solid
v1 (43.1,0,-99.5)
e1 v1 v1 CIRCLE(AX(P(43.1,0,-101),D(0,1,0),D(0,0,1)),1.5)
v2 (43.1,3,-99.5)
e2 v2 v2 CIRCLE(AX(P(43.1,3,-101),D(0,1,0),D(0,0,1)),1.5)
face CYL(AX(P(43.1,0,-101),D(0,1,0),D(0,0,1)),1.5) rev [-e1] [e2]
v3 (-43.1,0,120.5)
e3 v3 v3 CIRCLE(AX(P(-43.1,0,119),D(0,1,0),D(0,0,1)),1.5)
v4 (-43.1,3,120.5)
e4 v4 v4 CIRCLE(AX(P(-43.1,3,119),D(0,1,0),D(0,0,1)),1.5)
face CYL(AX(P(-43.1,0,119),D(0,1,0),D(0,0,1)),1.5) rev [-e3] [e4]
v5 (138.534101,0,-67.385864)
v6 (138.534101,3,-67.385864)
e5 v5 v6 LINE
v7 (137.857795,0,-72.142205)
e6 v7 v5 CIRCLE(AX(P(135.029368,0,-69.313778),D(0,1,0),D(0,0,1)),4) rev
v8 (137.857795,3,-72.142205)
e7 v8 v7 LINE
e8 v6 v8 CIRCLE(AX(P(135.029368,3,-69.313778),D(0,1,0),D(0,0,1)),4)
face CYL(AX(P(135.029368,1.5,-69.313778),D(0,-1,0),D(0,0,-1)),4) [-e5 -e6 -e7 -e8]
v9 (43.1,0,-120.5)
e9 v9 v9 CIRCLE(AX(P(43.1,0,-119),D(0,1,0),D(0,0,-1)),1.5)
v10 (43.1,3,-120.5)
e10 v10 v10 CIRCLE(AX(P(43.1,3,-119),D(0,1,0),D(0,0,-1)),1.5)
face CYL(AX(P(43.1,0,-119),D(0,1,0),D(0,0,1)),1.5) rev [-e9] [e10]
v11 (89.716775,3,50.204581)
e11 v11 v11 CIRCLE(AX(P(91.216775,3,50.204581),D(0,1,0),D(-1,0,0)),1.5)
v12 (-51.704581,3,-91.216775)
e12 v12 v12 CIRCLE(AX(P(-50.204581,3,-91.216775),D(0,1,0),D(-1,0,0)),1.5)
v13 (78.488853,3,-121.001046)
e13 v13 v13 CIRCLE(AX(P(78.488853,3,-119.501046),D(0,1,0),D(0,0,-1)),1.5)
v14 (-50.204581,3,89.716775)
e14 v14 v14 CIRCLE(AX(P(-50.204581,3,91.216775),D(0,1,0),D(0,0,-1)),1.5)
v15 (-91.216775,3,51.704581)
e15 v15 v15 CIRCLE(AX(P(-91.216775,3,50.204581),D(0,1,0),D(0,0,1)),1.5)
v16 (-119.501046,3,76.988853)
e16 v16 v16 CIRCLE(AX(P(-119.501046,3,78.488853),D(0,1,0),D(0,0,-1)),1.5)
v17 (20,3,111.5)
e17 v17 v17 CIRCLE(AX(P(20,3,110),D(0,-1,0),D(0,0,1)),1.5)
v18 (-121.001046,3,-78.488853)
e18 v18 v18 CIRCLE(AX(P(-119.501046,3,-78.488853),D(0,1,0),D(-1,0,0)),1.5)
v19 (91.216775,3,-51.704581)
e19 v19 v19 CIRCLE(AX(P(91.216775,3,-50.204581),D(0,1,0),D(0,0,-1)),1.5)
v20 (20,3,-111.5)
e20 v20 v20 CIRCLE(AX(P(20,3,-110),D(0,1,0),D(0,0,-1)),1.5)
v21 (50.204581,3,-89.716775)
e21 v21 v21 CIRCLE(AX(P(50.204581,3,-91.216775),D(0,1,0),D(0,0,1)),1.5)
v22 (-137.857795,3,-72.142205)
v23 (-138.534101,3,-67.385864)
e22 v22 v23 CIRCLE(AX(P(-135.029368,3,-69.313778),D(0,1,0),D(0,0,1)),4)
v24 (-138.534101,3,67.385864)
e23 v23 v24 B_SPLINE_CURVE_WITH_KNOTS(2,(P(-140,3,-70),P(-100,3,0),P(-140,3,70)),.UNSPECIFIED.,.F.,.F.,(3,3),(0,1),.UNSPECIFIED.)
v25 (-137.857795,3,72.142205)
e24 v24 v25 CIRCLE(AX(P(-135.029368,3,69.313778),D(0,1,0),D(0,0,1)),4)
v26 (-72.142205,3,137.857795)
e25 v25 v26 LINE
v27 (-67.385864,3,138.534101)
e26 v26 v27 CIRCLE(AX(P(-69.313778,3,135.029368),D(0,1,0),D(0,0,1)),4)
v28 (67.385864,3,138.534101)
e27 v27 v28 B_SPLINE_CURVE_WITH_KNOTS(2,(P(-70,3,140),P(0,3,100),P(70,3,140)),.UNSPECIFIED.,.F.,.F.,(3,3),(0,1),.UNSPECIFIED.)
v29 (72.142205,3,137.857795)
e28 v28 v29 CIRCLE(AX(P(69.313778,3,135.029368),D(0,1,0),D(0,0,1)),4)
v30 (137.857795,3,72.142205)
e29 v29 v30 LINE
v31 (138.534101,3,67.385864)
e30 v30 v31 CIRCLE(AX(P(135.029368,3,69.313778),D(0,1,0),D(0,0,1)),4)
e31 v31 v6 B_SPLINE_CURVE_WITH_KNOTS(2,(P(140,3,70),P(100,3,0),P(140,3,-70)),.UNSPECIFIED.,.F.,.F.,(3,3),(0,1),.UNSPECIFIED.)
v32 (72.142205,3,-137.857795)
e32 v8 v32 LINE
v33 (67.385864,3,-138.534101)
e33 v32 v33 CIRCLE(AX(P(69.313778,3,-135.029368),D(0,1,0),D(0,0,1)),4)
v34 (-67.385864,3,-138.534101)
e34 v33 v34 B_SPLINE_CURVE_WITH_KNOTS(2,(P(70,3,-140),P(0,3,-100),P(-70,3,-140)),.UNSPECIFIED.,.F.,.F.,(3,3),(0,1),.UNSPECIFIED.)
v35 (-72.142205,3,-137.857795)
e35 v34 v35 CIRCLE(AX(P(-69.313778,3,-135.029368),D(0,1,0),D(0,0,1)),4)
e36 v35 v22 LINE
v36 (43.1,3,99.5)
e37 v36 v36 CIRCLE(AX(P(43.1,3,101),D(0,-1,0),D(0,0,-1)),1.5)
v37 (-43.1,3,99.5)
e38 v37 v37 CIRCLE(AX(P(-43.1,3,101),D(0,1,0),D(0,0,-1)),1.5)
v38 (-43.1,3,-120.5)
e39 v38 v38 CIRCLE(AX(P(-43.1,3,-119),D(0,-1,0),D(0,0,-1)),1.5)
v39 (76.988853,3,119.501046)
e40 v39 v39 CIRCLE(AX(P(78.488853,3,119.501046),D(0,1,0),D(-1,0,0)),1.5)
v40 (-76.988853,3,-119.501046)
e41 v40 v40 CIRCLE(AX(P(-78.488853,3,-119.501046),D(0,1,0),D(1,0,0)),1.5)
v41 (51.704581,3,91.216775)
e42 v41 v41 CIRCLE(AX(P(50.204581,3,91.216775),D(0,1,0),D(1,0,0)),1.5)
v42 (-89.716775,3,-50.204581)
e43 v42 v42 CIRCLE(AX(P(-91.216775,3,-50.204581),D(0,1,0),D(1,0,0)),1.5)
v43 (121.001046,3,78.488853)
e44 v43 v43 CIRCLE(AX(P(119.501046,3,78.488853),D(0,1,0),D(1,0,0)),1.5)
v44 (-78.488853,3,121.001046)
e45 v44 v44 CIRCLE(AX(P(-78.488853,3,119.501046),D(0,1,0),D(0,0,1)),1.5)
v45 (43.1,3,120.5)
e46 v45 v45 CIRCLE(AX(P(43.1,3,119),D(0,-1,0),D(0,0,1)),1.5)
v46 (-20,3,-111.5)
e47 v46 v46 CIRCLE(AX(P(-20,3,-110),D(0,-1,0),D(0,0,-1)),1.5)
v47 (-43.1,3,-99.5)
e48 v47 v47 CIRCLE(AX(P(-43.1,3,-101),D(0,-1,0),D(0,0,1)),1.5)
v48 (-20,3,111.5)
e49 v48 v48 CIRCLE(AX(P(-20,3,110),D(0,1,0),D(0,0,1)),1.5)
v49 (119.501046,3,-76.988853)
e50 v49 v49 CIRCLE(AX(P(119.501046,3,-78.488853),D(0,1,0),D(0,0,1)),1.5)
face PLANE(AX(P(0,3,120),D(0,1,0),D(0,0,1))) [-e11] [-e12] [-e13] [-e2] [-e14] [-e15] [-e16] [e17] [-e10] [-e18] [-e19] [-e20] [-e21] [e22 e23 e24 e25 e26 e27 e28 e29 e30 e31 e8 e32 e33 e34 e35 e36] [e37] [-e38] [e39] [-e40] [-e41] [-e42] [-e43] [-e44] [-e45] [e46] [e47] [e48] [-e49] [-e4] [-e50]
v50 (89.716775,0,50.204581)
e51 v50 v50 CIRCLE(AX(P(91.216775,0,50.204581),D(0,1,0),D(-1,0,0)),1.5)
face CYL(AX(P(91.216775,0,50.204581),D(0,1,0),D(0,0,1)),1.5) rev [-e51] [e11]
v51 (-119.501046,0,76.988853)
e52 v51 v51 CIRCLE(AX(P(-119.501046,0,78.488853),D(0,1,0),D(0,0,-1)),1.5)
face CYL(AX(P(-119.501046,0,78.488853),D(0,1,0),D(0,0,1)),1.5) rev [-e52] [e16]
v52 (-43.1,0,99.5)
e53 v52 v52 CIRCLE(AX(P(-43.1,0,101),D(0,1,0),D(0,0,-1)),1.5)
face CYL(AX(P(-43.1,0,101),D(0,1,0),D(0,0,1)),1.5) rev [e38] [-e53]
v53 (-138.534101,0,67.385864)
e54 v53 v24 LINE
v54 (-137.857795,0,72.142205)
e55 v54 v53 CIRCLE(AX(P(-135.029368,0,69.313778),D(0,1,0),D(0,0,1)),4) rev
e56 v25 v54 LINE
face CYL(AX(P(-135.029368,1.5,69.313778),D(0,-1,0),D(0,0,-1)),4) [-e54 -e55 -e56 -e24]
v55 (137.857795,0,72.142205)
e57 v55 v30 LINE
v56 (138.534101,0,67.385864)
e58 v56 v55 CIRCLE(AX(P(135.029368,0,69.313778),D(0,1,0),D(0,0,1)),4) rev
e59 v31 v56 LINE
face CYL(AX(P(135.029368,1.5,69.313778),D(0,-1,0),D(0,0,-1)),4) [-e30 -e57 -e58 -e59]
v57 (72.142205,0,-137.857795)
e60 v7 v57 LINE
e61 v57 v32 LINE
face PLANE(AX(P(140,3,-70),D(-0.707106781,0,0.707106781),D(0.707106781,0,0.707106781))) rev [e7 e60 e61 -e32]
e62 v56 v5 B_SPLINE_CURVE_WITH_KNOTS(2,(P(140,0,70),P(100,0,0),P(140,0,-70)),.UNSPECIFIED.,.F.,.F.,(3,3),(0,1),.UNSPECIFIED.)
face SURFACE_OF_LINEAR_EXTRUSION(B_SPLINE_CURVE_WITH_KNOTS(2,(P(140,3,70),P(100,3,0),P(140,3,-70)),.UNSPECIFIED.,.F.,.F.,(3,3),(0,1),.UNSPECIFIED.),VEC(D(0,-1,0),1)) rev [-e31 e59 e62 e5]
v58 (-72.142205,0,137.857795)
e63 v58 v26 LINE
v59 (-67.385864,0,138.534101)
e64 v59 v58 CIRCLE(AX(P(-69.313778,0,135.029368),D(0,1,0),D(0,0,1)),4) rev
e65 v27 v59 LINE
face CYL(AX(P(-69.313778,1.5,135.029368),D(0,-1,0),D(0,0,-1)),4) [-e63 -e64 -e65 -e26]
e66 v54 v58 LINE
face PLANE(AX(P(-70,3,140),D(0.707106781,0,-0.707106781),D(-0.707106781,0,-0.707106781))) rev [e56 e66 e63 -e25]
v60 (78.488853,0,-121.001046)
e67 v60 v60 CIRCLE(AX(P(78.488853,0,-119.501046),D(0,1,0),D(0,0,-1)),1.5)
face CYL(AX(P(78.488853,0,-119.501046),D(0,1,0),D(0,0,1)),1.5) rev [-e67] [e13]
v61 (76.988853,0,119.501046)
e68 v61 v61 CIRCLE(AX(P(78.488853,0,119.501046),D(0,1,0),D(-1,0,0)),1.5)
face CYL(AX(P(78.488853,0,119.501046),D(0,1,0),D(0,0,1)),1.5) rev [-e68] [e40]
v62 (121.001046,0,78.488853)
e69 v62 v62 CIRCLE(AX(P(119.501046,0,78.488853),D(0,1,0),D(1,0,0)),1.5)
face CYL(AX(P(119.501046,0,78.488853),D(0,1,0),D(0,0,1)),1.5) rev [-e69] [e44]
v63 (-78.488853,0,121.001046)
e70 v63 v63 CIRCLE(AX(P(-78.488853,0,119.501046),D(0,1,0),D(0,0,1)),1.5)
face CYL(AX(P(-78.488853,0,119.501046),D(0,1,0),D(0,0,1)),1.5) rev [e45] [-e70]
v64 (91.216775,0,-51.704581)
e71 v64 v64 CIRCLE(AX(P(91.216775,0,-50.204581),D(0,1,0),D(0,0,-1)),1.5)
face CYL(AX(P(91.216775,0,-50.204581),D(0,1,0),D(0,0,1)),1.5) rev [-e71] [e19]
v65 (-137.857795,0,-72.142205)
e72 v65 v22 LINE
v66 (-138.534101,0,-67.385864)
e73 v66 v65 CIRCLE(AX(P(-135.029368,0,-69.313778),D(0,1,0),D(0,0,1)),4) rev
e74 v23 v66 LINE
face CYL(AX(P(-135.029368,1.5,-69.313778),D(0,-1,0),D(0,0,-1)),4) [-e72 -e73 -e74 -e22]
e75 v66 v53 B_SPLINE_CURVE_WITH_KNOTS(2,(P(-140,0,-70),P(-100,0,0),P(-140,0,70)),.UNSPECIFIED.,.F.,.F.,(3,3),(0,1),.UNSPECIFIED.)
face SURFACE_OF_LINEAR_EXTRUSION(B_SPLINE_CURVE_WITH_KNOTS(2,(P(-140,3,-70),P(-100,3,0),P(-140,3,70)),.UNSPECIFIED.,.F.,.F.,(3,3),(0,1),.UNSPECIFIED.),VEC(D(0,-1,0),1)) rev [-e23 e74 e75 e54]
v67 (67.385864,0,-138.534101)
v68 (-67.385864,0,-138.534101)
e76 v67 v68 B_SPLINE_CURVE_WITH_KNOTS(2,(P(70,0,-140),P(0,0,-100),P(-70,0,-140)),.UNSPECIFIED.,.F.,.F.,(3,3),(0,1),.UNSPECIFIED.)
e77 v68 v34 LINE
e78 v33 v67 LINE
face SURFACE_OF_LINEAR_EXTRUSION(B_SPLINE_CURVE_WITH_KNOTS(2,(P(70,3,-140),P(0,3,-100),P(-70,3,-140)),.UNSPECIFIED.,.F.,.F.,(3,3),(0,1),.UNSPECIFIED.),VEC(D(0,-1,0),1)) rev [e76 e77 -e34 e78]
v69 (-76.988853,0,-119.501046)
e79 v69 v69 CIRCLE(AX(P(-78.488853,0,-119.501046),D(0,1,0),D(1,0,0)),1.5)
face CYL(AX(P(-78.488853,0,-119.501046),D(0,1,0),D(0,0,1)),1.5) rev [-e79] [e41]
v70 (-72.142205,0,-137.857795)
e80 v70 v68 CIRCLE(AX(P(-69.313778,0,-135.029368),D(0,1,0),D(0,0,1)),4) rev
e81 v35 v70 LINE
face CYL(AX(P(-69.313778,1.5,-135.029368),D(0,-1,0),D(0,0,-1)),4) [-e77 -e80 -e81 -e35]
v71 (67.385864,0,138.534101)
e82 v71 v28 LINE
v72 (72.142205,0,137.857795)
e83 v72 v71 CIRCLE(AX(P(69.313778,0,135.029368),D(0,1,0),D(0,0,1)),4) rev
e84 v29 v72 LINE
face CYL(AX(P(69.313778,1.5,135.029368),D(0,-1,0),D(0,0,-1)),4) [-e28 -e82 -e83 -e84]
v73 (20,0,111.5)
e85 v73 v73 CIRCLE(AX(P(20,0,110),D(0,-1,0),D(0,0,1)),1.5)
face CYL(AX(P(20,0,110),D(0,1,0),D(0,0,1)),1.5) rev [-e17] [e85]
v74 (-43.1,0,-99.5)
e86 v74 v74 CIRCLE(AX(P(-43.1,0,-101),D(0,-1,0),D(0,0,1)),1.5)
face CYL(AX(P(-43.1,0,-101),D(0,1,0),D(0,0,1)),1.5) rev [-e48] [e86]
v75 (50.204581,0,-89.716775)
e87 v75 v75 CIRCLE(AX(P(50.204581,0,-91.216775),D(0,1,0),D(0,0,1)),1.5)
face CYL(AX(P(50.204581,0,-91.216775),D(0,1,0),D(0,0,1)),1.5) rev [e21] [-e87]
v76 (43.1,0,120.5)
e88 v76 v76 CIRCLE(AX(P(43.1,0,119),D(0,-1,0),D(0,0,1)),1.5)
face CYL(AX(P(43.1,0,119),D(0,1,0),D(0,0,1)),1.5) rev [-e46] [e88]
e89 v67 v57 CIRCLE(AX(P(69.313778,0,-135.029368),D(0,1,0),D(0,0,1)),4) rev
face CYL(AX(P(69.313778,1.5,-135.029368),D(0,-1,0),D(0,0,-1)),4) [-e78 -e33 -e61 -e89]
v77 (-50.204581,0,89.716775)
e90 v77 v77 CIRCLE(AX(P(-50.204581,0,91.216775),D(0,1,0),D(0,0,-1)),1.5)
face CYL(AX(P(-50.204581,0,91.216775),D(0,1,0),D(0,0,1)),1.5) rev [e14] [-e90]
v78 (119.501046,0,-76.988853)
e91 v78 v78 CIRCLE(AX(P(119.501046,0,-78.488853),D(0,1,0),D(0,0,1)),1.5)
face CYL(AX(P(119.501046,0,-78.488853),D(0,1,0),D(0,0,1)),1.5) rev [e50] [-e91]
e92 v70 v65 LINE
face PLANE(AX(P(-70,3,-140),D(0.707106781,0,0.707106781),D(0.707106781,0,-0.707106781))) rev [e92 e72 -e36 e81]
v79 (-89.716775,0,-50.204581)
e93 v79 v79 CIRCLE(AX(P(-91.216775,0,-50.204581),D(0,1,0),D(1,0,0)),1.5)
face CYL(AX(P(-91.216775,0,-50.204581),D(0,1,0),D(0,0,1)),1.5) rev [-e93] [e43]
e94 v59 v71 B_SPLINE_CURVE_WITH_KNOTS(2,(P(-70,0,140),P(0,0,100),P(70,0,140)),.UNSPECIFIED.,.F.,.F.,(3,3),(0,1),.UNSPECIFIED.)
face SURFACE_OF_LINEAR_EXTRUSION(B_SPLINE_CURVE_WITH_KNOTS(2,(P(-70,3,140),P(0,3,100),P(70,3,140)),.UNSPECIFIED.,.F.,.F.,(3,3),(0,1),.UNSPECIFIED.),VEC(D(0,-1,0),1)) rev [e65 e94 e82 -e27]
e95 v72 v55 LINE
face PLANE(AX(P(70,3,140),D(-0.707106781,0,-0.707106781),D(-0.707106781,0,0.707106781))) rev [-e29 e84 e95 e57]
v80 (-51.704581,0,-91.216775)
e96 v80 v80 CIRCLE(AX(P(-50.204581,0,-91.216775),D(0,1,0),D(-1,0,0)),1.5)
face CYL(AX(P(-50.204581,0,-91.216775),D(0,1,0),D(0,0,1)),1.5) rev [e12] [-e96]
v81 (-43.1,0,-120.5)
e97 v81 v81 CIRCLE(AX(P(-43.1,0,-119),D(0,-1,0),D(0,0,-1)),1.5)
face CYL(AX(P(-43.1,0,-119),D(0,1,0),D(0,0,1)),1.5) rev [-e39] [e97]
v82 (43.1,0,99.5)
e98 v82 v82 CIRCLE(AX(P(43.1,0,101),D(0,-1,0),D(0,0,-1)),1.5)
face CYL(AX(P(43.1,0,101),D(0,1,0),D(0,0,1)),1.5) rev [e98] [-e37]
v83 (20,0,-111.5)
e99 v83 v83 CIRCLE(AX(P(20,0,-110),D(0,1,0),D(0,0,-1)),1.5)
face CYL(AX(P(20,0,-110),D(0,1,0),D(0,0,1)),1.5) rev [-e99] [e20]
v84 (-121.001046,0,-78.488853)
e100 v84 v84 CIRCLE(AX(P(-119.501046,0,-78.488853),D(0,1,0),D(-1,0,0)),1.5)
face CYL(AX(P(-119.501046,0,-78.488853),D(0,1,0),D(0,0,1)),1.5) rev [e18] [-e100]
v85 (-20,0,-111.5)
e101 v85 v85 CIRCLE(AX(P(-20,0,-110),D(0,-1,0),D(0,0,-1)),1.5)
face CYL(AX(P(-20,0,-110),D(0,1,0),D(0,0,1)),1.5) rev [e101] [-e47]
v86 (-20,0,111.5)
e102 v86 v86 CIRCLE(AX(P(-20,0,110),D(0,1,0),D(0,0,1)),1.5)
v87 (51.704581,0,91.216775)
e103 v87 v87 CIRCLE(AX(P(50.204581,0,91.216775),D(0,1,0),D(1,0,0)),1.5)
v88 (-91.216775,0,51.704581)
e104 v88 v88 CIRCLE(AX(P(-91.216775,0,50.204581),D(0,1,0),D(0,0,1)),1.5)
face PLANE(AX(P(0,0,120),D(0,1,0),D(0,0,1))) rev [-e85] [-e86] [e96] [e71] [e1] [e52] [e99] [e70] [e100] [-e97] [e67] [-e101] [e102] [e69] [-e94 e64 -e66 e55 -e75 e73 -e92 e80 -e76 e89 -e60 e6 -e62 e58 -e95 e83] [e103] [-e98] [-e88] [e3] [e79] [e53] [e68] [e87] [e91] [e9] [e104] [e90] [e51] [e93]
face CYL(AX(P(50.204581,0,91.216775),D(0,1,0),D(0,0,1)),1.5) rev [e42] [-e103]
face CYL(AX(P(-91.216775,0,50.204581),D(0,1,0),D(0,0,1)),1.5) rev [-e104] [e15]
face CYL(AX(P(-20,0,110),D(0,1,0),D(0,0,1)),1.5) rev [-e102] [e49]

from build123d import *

# Parameters (mm, degrees)
DODANIE_WYCI_GNI_CIE1_DEPTH = 3
ZAOKR_GLENIE1_R             = 4
SZKIC2_R                    = 1.5
WYTNIJ_WYCI_GNI_CIE1_DEPTH  = 197.640104054
SZYK_KO_OWY1_COUNT          = 4
SZKIC3_R                    = 1.5
WYTNIJ_WYCI_GNI_CIE2_DEPTH  = 197.640104054
SZYK_KO_OWY2_OUTLINE_R      = 1.5
SZYK_KO_OWY2_DEPTH          = 3


# Read off the part's stored shape, not the designer's step: Szyk kołowy2
with BuildPart() as part:
    # Szkic1 → Dodanie-wyciągnięcie1 (new body)
    with BuildSketch(Plane(origin=(0, 0, 0), x_dir=(1, 0, 0), z_dir=(0, 1, 0))):
        with BuildLine():
            Line((-70, -140), (-140, -70))
            add(Edge.make_bspline(
                [(-140, 70), (-100, 0), (-140, -70)],
                knots=[0, 0, 0, 1, 1, 1], degree=2))
            Line((-140, 70), (-70, 140))
            add(Edge.make_bspline(
                [(70, 140), (0, 100), (-70, 140)],
                knots=[0, 0, 0, 1, 1, 1], degree=2))
            Line((70, 140), (140, 70))
            add(Edge.make_bspline(
                [(140, -70), (100, 0), (140, 70)],
                knots=[0, 0, 0, 1, 1, 1], degree=2))
            Line((140, -70), (70, -140))
            add(Edge.make_bspline(
                [(-70, -140), (0, -100), (70, -140)],
                knots=[0, 0, 0, 1, 1, 1], degree=2))
        make_face()
    extrude(amount=DODANIE_WYCI_GNI_CIE1_DEPTH)

    # Zaokrąglenie1
    zaokr_glenie1_edges = [part.edges().sort_by_distance(p)[0] for p in [
        (-140, 1.5, -70),
        (-70, 1.5, -140),
        (70, 1.5, -140),
        (140, 1.5, -70),
        (140, 1.5, 70),
        (70, 1.5, 140),
        (-140, 1.5, 70),
        (-70, 1.5, 140),
    ]]
    fillet(zaokr_glenie1_edges, radius=ZAOKR_GLENIE1_R)

    # Szkic2 → Wytnij-wyciągnięcie1 (cut, through all)
    with BuildSketch(Plane(origin=(0, 3, 0), x_dir=(1, 0, 0), z_dir=(0, 1, 0))):
        with Locations(Location((-78.488852712, -119.501046021, 0), (0, 0, 270))):
            Circle(SZKIC2_R)
        with Locations(Location((-119.501046021, -78.488852712, 0), (0, 0, 90))):
            Circle(SZKIC2_R)
        with Locations(Location((-50.204581464, -91.216774773, 0), (0, 0, 90))):
            Circle(SZKIC2_R)
        with Locations(Location((-91.216774773, -50.204581464, 0), (0, 0, 270))):
            Circle(SZKIC2_R)
    wytnij_wyci_gni_cie1 = extrude(amount=-WYTNIJ_WYCI_GNI_CIE1_DEPTH, mode=Mode.SUBTRACT)

    # Szyk kołowy1: Wytnij-wyciągnięcie1 ×4 about axis
    szyk_ko_owy1_axis = Axis((0, 0, 0), (0, 1, 0))
    for i in range(1, SZYK_KO_OWY1_COUNT):
        add(wytnij_wyci_gni_cie1.rotate(szyk_ko_owy1_axis, i * 360 / SZYK_KO_OWY1_COUNT), mode=Mode.SUBTRACT)

    # Szkic3 → Wytnij-wyciągnięcie2 (cut, through all)
    with BuildSketch(Plane(origin=(0, 3, 0), x_dir=(1, 0, 0), z_dir=(0, 1, 0))):
        with Locations(Location((-43.1, -119, 0), (0, 0, 270))):
            Circle(SZKIC3_R)
        with Locations(Location((-20, -110, 0), (0, 0, 270))):
            Circle(SZKIC3_R)
        with Locations(Location((-43.1, -101, 0), (0, 0, 90))):
            Circle(SZKIC3_R)
    wytnij_wyci_gni_cie2 = extrude(amount=-WYTNIJ_WYCI_GNI_CIE2_DEPTH, mode=Mode.SUBTRACT)

    # Lustro1: Wytnij-wyciągnięcie2 across plane
    add(wytnij_wyci_gni_cie2.mirror(Plane(origin=(0, 0, 0), x_dir=(0, 0, 1), z_dir=(1, 0, 0))), mode=Mode.SUBTRACT)

    # Szyk kołowy2 outline → Szyk kołowy2 (cut)
    with BuildSketch(Plane(origin=(0, 0, 0), x_dir=(1, 0, 0), z_dir=(0, 1, 0))):
        with Locations((-43.1, 101)):
            Circle(SZYK_KO_OWY2_OUTLINE_R)
        with Locations((-20, 110)):
            Circle(SZYK_KO_OWY2_OUTLINE_R)
        with Locations((-43.1, 119)):
            Circle(SZYK_KO_OWY2_OUTLINE_R)
        with Locations((43.1, 119)):
            Circle(SZYK_KO_OWY2_OUTLINE_R)
        with Locations((43.1, 101)):
            Circle(SZYK_KO_OWY2_OUTLINE_R)
        with Locations((20, 110)):
            Circle(SZYK_KO_OWY2_OUTLINE_R)
    extrude(amount=SZYK_KO_OWY2_DEPTH, mode=Mode.SUBTRACT)


solid = part.part
